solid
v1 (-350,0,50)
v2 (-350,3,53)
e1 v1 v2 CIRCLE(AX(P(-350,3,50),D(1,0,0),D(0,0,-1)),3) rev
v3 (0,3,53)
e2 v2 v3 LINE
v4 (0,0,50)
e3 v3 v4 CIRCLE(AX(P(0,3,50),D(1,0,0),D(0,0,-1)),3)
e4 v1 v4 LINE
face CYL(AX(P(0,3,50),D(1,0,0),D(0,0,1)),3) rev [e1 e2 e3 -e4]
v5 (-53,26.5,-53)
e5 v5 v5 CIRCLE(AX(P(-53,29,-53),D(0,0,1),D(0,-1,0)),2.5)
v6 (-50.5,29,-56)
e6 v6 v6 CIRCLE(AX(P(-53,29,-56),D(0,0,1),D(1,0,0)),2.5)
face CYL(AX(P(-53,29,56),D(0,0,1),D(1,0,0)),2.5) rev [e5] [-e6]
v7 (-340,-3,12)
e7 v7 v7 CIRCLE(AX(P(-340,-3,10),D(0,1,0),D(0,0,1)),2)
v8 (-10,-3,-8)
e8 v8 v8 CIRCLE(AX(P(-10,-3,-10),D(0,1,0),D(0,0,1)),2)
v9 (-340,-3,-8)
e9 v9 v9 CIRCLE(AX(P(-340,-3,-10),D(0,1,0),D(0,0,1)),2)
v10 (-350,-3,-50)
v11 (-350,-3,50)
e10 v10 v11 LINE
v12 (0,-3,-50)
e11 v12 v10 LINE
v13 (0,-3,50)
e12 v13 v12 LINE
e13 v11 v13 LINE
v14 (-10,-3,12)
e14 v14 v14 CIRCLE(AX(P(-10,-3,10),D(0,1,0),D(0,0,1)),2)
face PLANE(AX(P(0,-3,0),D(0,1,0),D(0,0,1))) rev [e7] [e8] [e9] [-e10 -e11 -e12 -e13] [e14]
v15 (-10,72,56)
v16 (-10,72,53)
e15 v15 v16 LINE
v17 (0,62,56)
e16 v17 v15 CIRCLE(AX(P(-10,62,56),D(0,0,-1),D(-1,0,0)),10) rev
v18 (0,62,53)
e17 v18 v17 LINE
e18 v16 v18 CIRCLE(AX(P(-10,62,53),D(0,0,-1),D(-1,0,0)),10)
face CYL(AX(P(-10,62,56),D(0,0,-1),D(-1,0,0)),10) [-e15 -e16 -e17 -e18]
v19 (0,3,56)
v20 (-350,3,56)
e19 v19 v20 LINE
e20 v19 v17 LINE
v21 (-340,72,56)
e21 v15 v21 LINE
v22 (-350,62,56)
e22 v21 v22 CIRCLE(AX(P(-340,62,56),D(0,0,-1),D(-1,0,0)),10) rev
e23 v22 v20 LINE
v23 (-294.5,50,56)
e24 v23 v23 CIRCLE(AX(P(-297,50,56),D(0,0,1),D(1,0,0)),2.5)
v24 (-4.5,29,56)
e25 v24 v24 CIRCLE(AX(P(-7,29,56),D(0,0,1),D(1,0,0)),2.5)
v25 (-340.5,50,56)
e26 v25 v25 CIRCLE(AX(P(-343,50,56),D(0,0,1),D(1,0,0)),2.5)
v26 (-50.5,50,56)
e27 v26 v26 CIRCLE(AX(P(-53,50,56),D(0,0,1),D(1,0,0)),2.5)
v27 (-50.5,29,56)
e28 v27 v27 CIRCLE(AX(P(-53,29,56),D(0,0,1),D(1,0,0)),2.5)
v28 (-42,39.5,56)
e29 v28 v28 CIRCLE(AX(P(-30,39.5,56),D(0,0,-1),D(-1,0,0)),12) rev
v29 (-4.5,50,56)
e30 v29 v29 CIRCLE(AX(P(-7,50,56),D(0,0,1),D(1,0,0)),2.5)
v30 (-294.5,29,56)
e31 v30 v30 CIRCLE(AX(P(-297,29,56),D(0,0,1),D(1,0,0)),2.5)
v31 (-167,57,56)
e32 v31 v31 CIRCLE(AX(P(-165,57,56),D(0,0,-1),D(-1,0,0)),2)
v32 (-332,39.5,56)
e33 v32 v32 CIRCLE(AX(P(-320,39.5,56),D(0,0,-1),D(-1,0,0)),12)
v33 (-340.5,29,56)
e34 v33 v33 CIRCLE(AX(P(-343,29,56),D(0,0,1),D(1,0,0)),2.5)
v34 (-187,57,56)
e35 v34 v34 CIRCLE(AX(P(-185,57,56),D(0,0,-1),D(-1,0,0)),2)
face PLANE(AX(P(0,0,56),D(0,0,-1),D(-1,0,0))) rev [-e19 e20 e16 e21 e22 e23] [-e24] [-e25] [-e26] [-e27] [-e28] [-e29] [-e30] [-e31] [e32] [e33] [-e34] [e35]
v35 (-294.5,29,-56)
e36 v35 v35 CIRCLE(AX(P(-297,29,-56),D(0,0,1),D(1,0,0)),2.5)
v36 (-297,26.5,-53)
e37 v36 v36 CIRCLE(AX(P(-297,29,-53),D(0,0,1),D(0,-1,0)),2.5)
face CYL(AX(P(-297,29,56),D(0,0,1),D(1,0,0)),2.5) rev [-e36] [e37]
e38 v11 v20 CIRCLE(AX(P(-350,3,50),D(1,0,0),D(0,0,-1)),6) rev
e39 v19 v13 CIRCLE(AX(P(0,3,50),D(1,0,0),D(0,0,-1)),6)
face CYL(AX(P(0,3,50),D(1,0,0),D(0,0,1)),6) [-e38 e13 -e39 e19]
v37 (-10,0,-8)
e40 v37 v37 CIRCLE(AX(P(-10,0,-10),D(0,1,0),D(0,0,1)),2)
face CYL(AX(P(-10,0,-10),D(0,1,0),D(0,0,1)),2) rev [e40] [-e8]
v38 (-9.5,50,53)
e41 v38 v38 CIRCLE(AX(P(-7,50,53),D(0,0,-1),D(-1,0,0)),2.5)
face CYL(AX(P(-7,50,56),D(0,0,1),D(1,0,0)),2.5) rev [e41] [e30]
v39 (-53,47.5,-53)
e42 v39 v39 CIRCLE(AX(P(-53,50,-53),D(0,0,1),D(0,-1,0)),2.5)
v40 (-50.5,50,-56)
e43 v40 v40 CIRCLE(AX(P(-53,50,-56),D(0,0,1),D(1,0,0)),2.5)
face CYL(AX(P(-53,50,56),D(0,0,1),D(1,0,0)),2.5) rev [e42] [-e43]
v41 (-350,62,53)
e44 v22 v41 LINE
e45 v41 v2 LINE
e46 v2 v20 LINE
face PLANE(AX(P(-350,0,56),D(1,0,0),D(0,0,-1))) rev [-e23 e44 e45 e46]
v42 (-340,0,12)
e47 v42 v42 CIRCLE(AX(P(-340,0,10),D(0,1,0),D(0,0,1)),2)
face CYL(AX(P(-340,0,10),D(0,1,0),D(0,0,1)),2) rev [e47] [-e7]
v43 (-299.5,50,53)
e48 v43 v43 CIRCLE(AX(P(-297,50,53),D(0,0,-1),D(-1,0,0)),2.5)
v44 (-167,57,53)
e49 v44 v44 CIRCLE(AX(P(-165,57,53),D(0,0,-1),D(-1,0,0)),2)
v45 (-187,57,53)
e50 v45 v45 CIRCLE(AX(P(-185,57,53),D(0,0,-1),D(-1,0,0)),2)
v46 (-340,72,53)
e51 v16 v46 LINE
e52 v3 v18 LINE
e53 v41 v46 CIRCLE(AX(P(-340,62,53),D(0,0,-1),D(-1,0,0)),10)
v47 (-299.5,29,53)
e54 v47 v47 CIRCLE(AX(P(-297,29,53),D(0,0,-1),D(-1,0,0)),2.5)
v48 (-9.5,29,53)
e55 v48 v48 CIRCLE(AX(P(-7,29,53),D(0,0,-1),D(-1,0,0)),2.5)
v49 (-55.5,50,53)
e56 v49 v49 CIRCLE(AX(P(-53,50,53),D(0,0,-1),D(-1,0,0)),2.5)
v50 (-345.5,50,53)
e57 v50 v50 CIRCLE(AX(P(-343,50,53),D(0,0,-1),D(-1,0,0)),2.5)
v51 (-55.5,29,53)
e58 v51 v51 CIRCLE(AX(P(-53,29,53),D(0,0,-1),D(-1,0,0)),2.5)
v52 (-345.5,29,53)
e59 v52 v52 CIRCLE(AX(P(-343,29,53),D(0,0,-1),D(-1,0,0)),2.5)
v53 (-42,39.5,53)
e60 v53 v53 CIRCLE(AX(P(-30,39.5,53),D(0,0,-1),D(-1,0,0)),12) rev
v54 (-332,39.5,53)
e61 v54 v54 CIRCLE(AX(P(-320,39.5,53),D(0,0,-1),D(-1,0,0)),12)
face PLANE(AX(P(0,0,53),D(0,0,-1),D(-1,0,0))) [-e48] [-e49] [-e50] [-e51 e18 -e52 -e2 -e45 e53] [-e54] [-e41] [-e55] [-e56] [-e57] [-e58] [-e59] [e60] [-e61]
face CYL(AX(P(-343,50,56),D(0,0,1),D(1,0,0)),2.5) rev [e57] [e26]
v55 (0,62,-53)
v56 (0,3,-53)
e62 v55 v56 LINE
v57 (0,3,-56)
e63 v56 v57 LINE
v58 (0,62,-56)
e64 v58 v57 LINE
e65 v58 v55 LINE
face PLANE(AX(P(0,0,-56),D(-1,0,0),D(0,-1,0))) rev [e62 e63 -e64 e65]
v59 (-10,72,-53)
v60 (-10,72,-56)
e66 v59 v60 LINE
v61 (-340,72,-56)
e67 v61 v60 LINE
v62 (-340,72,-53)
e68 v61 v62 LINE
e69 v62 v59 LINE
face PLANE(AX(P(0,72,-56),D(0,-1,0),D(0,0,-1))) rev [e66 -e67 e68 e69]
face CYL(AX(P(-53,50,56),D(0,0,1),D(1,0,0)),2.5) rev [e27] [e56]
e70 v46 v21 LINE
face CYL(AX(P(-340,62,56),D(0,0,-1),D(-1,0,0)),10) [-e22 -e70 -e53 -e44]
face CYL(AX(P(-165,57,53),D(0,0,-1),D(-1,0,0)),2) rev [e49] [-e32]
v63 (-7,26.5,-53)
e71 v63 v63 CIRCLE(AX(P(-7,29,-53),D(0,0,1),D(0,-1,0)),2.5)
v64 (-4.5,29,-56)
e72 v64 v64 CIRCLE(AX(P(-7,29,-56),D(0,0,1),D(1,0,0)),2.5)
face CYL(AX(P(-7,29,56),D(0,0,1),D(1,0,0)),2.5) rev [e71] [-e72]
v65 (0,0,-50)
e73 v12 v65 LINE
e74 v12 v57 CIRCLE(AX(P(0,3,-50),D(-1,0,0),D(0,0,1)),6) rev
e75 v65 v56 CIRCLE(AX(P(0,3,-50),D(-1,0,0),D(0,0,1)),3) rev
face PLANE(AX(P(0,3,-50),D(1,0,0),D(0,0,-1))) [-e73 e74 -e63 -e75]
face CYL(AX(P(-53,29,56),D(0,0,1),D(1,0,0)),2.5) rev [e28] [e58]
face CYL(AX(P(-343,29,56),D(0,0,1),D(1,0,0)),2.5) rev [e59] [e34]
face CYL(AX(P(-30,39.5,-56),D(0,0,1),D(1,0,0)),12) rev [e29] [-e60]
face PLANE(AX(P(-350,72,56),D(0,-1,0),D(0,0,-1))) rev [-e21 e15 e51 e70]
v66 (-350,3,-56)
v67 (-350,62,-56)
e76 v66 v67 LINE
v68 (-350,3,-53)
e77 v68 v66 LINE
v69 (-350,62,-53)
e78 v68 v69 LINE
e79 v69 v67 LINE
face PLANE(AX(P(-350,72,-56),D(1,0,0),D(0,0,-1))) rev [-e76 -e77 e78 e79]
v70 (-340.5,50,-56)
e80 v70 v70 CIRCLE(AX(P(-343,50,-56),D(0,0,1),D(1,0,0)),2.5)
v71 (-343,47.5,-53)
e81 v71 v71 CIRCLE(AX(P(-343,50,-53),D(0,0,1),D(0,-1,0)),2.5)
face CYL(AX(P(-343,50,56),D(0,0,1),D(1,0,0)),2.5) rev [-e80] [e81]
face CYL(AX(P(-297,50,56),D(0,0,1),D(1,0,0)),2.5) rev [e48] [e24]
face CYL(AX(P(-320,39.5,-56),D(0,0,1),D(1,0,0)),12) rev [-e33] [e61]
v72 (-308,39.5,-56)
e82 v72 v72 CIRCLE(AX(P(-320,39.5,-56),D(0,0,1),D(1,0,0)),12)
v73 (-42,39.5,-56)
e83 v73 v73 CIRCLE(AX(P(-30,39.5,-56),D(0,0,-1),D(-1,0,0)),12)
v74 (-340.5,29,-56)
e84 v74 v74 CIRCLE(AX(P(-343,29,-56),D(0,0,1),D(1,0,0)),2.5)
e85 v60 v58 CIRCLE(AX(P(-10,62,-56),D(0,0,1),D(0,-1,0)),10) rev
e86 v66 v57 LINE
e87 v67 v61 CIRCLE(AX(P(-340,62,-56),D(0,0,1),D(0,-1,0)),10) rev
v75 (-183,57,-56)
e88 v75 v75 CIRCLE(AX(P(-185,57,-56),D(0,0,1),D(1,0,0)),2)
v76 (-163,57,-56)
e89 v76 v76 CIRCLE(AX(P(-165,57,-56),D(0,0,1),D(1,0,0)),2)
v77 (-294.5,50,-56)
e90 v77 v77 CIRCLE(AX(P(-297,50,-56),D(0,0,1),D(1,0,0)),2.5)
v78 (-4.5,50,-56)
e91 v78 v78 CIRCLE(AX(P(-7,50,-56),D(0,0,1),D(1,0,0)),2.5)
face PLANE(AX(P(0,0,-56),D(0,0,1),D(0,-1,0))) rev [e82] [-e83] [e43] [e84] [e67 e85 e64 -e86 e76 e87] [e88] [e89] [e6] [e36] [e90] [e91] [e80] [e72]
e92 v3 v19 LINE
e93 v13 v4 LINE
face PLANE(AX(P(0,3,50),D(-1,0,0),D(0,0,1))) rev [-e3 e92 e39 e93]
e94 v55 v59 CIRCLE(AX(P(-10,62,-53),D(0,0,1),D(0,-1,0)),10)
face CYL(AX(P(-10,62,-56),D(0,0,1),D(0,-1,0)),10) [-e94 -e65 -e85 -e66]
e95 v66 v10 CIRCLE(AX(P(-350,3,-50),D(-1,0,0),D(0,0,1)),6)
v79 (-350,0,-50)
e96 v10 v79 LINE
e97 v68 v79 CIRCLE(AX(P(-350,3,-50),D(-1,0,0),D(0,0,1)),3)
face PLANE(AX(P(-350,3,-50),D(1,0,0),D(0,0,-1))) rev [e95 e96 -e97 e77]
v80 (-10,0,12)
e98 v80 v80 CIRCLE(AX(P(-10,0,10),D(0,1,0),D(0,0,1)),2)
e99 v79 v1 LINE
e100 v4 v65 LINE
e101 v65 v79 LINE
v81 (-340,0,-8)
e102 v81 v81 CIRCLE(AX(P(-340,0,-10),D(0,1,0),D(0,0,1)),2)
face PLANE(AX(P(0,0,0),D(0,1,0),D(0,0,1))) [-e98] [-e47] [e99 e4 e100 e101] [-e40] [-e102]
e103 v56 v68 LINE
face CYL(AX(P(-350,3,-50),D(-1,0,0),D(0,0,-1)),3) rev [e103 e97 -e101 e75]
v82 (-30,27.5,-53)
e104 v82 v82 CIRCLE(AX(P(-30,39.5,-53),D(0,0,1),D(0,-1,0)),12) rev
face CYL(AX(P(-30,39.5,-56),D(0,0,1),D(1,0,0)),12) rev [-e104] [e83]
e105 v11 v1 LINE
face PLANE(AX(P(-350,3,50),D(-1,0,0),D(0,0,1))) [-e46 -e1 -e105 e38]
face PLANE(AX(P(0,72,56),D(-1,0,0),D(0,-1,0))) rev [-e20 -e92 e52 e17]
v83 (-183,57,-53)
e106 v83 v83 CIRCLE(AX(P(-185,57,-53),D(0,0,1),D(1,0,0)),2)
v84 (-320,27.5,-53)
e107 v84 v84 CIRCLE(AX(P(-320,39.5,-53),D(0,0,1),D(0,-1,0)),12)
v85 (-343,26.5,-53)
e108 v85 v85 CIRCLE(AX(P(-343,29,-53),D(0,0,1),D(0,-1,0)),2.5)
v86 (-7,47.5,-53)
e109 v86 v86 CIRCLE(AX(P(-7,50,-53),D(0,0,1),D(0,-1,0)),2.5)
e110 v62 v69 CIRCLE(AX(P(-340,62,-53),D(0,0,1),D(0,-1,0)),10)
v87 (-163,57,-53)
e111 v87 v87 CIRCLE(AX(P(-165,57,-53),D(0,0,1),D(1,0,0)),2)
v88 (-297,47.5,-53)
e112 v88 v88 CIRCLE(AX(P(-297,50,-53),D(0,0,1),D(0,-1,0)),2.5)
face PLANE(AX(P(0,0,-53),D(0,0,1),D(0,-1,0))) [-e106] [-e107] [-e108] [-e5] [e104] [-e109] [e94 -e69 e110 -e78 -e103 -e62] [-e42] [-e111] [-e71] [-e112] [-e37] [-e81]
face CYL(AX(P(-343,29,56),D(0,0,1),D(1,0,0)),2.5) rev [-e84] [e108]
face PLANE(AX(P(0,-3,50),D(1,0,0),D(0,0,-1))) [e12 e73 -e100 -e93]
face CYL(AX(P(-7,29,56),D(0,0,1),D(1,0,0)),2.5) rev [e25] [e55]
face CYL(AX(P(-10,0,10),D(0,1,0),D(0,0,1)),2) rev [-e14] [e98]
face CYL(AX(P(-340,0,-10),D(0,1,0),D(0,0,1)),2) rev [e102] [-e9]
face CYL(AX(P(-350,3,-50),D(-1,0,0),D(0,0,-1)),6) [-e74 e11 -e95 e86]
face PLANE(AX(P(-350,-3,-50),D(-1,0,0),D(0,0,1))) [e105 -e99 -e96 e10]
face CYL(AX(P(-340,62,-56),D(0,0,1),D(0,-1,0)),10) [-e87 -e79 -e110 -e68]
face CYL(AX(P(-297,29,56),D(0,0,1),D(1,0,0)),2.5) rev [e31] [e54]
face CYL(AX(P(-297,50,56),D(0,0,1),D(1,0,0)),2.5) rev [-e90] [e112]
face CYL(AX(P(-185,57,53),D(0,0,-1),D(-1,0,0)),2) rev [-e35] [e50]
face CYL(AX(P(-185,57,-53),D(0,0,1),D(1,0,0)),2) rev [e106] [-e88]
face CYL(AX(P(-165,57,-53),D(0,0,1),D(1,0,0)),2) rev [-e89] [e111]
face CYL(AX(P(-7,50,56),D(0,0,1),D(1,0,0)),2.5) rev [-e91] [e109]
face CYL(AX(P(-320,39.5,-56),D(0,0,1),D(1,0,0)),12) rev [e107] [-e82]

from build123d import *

# Parameters (mm, degrees)
SKETCH1_W                    = 350
SKETCH1_H                    = 100
BASE_FLANGE1_DEPTH           = 3
SM_EDGE_FLANGE_1_DEPTH       = 350
SM_EDGE_FLANGE_1_BEND_DEPTH  = 350
F_5_0_5_DIAMETER_HOLE1_D     = 5
SKETCH14_R                   = 12
CUT_EXTRUDE1_DEPTH           = 375.470292547
F_4_0_4_DIAMETER_HOLE1_D     = 4
F_4_0_4_DIAMETER_HOLE1_DEPTH = 3
F_4_0_4_DIAMETER_HOLE2_D     = 4
FILLET1_R                    = 10


# Sheet-metal steps are written as plain solids
with BuildPart() as part:
    # Sketch1 → Base-Flange1 (new body)
    with BuildSketch(Plane(origin=(0, 0, 0), x_dir=(1, 0, 0), z_dir=(0, 1, 0))):
        with Locations((-175, 0)):
            Rectangle(SKETCH1_W, SKETCH1_H)
    extrude(amount=-BASE_FLANGE1_DEPTH)

    # 邊線-凸緣1 section (across the edge) → 邊線-凸緣1 (add)
    with BuildSketch(Plane(origin=(-350, 0, 53), x_dir=(0, 0, -1), z_dir=(1, 0, 0))):
        with BuildLine():
            Line((-3, 3), (-3, 72))
            Line((-3, 72), (0, 72))
            Line((0, 72), (0, 3))
            ThreePointArc((0, 3), (0.878679656, 0.878679656), (3, 0))
            Line((3, 0), (3, -3))
            ThreePointArc((3, -3), (-1.242640687, -1.242640687), (-3, 3))
        make_face()
    extrude(amount=SM_EDGE_FLANGE_1_DEPTH)

    # 邊線-凸緣1 section 2 (across the edge) → 邊線-凸緣1 bend (add)
    with BuildSketch(Plane(origin=(0, 0, -53), x_dir=(0, 0, 1), z_dir=(-1, 0, 0))):
        with BuildLine():
            Line((-3, 3), (-3, 72))
            Line((-3, 72), (0, 72))
            Line((0, 72), (0, 3))
            ThreePointArc((0, 3), (0.878679656, 0.878679656), (3, 0))
            Line((3, 0), (3, -3))
            ThreePointArc((3, -3), (-1.242640687, -1.242640687), (-3, 3))
        make_face()
    extrude(amount=SM_EDGE_FLANGE_1_BEND_DEPTH)

    # Ø5.0 (5) Diameter Hole1 (through all)
    with Locations(Plane.XY.offset(56)):
        with Locations((-343, 50), (-343, 29), (-297, 50), (-297, 29)):
            f_5_0_5_diameter_hole1 = Hole(F_5_0_5_DIAMETER_HOLE1_D / 2)

    # Sketch14 → Cut-Extrude1 (cut, symmetric)
    with BuildSketch(Plane.XY.offset(56)):
        with Locations((-320, 39.5)):
            Circle(SKETCH14_R)
    cut_extrude1 = extrude(amount=CUT_EXTRUDE1_DEPTH, both=True, mode=Mode.SUBTRACT)

    # Mirror1: Ø5.0 (5) Diameter Hole1, Cut-Extrude1 across plane
    add(f_5_0_5_diameter_hole1.mirror(Plane(origin=(-175, 0, 0), x_dir=(0, 0, 1), z_dir=(1, 0, 0))), mode=Mode.SUBTRACT)
    add(cut_extrude1.mirror(Plane(origin=(-175, 0, 0), x_dir=(0, 0, 1), z_dir=(1, 0, 0))), mode=Mode.SUBTRACT)

    # Ø4.0 (4) Diameter Hole1
    with Locations(Plane.XY.offset(-53)):
        with Locations((-185, 57), (-165, 57)):
            f_4_0_4_diameter_hole1 = Hole(F_4_0_4_DIAMETER_HOLE1_D / 2, depth=F_4_0_4_DIAMETER_HOLE1_DEPTH)

    # Ø4.0 (4) Diameter Hole2 (through all)
    with Locations(Plane(origin=(0, 0, 0), x_dir=(1, 0, 0), z_dir=(0, 1, 0))):
        with Locations((-340, 10), (-340, -10)):
            f_4_0_4_diameter_hole2 = Hole(F_4_0_4_DIAMETER_HOLE2_D / 2)

    # Mirror2: Ø4.0 (4) Diameter Hole2 across plane
    add(f_4_0_4_diameter_hole2.mirror(Plane(origin=(-175, 0, 0), x_dir=(0, 0, 1), z_dir=(1, 0, 0))), mode=Mode.SUBTRACT)

    # Mirror3: Ø4.0 (4) Diameter Hole1 across plane
    add(f_4_0_4_diameter_hole1.mirror(Plane.XY), mode=Mode.SUBTRACT)

    # Fillet1
    fillet1_edges = [part.edges().sort_by_distance(p)[0] for p in [
        (-350, 72, 54.5),
        (0, 72, 54.5),
        (0, 72, -54.5),
        (-350, 72, -54.5),
    ]]
    fillet(fillet1_edges, radius=FILLET1_R)


solid = part.part
